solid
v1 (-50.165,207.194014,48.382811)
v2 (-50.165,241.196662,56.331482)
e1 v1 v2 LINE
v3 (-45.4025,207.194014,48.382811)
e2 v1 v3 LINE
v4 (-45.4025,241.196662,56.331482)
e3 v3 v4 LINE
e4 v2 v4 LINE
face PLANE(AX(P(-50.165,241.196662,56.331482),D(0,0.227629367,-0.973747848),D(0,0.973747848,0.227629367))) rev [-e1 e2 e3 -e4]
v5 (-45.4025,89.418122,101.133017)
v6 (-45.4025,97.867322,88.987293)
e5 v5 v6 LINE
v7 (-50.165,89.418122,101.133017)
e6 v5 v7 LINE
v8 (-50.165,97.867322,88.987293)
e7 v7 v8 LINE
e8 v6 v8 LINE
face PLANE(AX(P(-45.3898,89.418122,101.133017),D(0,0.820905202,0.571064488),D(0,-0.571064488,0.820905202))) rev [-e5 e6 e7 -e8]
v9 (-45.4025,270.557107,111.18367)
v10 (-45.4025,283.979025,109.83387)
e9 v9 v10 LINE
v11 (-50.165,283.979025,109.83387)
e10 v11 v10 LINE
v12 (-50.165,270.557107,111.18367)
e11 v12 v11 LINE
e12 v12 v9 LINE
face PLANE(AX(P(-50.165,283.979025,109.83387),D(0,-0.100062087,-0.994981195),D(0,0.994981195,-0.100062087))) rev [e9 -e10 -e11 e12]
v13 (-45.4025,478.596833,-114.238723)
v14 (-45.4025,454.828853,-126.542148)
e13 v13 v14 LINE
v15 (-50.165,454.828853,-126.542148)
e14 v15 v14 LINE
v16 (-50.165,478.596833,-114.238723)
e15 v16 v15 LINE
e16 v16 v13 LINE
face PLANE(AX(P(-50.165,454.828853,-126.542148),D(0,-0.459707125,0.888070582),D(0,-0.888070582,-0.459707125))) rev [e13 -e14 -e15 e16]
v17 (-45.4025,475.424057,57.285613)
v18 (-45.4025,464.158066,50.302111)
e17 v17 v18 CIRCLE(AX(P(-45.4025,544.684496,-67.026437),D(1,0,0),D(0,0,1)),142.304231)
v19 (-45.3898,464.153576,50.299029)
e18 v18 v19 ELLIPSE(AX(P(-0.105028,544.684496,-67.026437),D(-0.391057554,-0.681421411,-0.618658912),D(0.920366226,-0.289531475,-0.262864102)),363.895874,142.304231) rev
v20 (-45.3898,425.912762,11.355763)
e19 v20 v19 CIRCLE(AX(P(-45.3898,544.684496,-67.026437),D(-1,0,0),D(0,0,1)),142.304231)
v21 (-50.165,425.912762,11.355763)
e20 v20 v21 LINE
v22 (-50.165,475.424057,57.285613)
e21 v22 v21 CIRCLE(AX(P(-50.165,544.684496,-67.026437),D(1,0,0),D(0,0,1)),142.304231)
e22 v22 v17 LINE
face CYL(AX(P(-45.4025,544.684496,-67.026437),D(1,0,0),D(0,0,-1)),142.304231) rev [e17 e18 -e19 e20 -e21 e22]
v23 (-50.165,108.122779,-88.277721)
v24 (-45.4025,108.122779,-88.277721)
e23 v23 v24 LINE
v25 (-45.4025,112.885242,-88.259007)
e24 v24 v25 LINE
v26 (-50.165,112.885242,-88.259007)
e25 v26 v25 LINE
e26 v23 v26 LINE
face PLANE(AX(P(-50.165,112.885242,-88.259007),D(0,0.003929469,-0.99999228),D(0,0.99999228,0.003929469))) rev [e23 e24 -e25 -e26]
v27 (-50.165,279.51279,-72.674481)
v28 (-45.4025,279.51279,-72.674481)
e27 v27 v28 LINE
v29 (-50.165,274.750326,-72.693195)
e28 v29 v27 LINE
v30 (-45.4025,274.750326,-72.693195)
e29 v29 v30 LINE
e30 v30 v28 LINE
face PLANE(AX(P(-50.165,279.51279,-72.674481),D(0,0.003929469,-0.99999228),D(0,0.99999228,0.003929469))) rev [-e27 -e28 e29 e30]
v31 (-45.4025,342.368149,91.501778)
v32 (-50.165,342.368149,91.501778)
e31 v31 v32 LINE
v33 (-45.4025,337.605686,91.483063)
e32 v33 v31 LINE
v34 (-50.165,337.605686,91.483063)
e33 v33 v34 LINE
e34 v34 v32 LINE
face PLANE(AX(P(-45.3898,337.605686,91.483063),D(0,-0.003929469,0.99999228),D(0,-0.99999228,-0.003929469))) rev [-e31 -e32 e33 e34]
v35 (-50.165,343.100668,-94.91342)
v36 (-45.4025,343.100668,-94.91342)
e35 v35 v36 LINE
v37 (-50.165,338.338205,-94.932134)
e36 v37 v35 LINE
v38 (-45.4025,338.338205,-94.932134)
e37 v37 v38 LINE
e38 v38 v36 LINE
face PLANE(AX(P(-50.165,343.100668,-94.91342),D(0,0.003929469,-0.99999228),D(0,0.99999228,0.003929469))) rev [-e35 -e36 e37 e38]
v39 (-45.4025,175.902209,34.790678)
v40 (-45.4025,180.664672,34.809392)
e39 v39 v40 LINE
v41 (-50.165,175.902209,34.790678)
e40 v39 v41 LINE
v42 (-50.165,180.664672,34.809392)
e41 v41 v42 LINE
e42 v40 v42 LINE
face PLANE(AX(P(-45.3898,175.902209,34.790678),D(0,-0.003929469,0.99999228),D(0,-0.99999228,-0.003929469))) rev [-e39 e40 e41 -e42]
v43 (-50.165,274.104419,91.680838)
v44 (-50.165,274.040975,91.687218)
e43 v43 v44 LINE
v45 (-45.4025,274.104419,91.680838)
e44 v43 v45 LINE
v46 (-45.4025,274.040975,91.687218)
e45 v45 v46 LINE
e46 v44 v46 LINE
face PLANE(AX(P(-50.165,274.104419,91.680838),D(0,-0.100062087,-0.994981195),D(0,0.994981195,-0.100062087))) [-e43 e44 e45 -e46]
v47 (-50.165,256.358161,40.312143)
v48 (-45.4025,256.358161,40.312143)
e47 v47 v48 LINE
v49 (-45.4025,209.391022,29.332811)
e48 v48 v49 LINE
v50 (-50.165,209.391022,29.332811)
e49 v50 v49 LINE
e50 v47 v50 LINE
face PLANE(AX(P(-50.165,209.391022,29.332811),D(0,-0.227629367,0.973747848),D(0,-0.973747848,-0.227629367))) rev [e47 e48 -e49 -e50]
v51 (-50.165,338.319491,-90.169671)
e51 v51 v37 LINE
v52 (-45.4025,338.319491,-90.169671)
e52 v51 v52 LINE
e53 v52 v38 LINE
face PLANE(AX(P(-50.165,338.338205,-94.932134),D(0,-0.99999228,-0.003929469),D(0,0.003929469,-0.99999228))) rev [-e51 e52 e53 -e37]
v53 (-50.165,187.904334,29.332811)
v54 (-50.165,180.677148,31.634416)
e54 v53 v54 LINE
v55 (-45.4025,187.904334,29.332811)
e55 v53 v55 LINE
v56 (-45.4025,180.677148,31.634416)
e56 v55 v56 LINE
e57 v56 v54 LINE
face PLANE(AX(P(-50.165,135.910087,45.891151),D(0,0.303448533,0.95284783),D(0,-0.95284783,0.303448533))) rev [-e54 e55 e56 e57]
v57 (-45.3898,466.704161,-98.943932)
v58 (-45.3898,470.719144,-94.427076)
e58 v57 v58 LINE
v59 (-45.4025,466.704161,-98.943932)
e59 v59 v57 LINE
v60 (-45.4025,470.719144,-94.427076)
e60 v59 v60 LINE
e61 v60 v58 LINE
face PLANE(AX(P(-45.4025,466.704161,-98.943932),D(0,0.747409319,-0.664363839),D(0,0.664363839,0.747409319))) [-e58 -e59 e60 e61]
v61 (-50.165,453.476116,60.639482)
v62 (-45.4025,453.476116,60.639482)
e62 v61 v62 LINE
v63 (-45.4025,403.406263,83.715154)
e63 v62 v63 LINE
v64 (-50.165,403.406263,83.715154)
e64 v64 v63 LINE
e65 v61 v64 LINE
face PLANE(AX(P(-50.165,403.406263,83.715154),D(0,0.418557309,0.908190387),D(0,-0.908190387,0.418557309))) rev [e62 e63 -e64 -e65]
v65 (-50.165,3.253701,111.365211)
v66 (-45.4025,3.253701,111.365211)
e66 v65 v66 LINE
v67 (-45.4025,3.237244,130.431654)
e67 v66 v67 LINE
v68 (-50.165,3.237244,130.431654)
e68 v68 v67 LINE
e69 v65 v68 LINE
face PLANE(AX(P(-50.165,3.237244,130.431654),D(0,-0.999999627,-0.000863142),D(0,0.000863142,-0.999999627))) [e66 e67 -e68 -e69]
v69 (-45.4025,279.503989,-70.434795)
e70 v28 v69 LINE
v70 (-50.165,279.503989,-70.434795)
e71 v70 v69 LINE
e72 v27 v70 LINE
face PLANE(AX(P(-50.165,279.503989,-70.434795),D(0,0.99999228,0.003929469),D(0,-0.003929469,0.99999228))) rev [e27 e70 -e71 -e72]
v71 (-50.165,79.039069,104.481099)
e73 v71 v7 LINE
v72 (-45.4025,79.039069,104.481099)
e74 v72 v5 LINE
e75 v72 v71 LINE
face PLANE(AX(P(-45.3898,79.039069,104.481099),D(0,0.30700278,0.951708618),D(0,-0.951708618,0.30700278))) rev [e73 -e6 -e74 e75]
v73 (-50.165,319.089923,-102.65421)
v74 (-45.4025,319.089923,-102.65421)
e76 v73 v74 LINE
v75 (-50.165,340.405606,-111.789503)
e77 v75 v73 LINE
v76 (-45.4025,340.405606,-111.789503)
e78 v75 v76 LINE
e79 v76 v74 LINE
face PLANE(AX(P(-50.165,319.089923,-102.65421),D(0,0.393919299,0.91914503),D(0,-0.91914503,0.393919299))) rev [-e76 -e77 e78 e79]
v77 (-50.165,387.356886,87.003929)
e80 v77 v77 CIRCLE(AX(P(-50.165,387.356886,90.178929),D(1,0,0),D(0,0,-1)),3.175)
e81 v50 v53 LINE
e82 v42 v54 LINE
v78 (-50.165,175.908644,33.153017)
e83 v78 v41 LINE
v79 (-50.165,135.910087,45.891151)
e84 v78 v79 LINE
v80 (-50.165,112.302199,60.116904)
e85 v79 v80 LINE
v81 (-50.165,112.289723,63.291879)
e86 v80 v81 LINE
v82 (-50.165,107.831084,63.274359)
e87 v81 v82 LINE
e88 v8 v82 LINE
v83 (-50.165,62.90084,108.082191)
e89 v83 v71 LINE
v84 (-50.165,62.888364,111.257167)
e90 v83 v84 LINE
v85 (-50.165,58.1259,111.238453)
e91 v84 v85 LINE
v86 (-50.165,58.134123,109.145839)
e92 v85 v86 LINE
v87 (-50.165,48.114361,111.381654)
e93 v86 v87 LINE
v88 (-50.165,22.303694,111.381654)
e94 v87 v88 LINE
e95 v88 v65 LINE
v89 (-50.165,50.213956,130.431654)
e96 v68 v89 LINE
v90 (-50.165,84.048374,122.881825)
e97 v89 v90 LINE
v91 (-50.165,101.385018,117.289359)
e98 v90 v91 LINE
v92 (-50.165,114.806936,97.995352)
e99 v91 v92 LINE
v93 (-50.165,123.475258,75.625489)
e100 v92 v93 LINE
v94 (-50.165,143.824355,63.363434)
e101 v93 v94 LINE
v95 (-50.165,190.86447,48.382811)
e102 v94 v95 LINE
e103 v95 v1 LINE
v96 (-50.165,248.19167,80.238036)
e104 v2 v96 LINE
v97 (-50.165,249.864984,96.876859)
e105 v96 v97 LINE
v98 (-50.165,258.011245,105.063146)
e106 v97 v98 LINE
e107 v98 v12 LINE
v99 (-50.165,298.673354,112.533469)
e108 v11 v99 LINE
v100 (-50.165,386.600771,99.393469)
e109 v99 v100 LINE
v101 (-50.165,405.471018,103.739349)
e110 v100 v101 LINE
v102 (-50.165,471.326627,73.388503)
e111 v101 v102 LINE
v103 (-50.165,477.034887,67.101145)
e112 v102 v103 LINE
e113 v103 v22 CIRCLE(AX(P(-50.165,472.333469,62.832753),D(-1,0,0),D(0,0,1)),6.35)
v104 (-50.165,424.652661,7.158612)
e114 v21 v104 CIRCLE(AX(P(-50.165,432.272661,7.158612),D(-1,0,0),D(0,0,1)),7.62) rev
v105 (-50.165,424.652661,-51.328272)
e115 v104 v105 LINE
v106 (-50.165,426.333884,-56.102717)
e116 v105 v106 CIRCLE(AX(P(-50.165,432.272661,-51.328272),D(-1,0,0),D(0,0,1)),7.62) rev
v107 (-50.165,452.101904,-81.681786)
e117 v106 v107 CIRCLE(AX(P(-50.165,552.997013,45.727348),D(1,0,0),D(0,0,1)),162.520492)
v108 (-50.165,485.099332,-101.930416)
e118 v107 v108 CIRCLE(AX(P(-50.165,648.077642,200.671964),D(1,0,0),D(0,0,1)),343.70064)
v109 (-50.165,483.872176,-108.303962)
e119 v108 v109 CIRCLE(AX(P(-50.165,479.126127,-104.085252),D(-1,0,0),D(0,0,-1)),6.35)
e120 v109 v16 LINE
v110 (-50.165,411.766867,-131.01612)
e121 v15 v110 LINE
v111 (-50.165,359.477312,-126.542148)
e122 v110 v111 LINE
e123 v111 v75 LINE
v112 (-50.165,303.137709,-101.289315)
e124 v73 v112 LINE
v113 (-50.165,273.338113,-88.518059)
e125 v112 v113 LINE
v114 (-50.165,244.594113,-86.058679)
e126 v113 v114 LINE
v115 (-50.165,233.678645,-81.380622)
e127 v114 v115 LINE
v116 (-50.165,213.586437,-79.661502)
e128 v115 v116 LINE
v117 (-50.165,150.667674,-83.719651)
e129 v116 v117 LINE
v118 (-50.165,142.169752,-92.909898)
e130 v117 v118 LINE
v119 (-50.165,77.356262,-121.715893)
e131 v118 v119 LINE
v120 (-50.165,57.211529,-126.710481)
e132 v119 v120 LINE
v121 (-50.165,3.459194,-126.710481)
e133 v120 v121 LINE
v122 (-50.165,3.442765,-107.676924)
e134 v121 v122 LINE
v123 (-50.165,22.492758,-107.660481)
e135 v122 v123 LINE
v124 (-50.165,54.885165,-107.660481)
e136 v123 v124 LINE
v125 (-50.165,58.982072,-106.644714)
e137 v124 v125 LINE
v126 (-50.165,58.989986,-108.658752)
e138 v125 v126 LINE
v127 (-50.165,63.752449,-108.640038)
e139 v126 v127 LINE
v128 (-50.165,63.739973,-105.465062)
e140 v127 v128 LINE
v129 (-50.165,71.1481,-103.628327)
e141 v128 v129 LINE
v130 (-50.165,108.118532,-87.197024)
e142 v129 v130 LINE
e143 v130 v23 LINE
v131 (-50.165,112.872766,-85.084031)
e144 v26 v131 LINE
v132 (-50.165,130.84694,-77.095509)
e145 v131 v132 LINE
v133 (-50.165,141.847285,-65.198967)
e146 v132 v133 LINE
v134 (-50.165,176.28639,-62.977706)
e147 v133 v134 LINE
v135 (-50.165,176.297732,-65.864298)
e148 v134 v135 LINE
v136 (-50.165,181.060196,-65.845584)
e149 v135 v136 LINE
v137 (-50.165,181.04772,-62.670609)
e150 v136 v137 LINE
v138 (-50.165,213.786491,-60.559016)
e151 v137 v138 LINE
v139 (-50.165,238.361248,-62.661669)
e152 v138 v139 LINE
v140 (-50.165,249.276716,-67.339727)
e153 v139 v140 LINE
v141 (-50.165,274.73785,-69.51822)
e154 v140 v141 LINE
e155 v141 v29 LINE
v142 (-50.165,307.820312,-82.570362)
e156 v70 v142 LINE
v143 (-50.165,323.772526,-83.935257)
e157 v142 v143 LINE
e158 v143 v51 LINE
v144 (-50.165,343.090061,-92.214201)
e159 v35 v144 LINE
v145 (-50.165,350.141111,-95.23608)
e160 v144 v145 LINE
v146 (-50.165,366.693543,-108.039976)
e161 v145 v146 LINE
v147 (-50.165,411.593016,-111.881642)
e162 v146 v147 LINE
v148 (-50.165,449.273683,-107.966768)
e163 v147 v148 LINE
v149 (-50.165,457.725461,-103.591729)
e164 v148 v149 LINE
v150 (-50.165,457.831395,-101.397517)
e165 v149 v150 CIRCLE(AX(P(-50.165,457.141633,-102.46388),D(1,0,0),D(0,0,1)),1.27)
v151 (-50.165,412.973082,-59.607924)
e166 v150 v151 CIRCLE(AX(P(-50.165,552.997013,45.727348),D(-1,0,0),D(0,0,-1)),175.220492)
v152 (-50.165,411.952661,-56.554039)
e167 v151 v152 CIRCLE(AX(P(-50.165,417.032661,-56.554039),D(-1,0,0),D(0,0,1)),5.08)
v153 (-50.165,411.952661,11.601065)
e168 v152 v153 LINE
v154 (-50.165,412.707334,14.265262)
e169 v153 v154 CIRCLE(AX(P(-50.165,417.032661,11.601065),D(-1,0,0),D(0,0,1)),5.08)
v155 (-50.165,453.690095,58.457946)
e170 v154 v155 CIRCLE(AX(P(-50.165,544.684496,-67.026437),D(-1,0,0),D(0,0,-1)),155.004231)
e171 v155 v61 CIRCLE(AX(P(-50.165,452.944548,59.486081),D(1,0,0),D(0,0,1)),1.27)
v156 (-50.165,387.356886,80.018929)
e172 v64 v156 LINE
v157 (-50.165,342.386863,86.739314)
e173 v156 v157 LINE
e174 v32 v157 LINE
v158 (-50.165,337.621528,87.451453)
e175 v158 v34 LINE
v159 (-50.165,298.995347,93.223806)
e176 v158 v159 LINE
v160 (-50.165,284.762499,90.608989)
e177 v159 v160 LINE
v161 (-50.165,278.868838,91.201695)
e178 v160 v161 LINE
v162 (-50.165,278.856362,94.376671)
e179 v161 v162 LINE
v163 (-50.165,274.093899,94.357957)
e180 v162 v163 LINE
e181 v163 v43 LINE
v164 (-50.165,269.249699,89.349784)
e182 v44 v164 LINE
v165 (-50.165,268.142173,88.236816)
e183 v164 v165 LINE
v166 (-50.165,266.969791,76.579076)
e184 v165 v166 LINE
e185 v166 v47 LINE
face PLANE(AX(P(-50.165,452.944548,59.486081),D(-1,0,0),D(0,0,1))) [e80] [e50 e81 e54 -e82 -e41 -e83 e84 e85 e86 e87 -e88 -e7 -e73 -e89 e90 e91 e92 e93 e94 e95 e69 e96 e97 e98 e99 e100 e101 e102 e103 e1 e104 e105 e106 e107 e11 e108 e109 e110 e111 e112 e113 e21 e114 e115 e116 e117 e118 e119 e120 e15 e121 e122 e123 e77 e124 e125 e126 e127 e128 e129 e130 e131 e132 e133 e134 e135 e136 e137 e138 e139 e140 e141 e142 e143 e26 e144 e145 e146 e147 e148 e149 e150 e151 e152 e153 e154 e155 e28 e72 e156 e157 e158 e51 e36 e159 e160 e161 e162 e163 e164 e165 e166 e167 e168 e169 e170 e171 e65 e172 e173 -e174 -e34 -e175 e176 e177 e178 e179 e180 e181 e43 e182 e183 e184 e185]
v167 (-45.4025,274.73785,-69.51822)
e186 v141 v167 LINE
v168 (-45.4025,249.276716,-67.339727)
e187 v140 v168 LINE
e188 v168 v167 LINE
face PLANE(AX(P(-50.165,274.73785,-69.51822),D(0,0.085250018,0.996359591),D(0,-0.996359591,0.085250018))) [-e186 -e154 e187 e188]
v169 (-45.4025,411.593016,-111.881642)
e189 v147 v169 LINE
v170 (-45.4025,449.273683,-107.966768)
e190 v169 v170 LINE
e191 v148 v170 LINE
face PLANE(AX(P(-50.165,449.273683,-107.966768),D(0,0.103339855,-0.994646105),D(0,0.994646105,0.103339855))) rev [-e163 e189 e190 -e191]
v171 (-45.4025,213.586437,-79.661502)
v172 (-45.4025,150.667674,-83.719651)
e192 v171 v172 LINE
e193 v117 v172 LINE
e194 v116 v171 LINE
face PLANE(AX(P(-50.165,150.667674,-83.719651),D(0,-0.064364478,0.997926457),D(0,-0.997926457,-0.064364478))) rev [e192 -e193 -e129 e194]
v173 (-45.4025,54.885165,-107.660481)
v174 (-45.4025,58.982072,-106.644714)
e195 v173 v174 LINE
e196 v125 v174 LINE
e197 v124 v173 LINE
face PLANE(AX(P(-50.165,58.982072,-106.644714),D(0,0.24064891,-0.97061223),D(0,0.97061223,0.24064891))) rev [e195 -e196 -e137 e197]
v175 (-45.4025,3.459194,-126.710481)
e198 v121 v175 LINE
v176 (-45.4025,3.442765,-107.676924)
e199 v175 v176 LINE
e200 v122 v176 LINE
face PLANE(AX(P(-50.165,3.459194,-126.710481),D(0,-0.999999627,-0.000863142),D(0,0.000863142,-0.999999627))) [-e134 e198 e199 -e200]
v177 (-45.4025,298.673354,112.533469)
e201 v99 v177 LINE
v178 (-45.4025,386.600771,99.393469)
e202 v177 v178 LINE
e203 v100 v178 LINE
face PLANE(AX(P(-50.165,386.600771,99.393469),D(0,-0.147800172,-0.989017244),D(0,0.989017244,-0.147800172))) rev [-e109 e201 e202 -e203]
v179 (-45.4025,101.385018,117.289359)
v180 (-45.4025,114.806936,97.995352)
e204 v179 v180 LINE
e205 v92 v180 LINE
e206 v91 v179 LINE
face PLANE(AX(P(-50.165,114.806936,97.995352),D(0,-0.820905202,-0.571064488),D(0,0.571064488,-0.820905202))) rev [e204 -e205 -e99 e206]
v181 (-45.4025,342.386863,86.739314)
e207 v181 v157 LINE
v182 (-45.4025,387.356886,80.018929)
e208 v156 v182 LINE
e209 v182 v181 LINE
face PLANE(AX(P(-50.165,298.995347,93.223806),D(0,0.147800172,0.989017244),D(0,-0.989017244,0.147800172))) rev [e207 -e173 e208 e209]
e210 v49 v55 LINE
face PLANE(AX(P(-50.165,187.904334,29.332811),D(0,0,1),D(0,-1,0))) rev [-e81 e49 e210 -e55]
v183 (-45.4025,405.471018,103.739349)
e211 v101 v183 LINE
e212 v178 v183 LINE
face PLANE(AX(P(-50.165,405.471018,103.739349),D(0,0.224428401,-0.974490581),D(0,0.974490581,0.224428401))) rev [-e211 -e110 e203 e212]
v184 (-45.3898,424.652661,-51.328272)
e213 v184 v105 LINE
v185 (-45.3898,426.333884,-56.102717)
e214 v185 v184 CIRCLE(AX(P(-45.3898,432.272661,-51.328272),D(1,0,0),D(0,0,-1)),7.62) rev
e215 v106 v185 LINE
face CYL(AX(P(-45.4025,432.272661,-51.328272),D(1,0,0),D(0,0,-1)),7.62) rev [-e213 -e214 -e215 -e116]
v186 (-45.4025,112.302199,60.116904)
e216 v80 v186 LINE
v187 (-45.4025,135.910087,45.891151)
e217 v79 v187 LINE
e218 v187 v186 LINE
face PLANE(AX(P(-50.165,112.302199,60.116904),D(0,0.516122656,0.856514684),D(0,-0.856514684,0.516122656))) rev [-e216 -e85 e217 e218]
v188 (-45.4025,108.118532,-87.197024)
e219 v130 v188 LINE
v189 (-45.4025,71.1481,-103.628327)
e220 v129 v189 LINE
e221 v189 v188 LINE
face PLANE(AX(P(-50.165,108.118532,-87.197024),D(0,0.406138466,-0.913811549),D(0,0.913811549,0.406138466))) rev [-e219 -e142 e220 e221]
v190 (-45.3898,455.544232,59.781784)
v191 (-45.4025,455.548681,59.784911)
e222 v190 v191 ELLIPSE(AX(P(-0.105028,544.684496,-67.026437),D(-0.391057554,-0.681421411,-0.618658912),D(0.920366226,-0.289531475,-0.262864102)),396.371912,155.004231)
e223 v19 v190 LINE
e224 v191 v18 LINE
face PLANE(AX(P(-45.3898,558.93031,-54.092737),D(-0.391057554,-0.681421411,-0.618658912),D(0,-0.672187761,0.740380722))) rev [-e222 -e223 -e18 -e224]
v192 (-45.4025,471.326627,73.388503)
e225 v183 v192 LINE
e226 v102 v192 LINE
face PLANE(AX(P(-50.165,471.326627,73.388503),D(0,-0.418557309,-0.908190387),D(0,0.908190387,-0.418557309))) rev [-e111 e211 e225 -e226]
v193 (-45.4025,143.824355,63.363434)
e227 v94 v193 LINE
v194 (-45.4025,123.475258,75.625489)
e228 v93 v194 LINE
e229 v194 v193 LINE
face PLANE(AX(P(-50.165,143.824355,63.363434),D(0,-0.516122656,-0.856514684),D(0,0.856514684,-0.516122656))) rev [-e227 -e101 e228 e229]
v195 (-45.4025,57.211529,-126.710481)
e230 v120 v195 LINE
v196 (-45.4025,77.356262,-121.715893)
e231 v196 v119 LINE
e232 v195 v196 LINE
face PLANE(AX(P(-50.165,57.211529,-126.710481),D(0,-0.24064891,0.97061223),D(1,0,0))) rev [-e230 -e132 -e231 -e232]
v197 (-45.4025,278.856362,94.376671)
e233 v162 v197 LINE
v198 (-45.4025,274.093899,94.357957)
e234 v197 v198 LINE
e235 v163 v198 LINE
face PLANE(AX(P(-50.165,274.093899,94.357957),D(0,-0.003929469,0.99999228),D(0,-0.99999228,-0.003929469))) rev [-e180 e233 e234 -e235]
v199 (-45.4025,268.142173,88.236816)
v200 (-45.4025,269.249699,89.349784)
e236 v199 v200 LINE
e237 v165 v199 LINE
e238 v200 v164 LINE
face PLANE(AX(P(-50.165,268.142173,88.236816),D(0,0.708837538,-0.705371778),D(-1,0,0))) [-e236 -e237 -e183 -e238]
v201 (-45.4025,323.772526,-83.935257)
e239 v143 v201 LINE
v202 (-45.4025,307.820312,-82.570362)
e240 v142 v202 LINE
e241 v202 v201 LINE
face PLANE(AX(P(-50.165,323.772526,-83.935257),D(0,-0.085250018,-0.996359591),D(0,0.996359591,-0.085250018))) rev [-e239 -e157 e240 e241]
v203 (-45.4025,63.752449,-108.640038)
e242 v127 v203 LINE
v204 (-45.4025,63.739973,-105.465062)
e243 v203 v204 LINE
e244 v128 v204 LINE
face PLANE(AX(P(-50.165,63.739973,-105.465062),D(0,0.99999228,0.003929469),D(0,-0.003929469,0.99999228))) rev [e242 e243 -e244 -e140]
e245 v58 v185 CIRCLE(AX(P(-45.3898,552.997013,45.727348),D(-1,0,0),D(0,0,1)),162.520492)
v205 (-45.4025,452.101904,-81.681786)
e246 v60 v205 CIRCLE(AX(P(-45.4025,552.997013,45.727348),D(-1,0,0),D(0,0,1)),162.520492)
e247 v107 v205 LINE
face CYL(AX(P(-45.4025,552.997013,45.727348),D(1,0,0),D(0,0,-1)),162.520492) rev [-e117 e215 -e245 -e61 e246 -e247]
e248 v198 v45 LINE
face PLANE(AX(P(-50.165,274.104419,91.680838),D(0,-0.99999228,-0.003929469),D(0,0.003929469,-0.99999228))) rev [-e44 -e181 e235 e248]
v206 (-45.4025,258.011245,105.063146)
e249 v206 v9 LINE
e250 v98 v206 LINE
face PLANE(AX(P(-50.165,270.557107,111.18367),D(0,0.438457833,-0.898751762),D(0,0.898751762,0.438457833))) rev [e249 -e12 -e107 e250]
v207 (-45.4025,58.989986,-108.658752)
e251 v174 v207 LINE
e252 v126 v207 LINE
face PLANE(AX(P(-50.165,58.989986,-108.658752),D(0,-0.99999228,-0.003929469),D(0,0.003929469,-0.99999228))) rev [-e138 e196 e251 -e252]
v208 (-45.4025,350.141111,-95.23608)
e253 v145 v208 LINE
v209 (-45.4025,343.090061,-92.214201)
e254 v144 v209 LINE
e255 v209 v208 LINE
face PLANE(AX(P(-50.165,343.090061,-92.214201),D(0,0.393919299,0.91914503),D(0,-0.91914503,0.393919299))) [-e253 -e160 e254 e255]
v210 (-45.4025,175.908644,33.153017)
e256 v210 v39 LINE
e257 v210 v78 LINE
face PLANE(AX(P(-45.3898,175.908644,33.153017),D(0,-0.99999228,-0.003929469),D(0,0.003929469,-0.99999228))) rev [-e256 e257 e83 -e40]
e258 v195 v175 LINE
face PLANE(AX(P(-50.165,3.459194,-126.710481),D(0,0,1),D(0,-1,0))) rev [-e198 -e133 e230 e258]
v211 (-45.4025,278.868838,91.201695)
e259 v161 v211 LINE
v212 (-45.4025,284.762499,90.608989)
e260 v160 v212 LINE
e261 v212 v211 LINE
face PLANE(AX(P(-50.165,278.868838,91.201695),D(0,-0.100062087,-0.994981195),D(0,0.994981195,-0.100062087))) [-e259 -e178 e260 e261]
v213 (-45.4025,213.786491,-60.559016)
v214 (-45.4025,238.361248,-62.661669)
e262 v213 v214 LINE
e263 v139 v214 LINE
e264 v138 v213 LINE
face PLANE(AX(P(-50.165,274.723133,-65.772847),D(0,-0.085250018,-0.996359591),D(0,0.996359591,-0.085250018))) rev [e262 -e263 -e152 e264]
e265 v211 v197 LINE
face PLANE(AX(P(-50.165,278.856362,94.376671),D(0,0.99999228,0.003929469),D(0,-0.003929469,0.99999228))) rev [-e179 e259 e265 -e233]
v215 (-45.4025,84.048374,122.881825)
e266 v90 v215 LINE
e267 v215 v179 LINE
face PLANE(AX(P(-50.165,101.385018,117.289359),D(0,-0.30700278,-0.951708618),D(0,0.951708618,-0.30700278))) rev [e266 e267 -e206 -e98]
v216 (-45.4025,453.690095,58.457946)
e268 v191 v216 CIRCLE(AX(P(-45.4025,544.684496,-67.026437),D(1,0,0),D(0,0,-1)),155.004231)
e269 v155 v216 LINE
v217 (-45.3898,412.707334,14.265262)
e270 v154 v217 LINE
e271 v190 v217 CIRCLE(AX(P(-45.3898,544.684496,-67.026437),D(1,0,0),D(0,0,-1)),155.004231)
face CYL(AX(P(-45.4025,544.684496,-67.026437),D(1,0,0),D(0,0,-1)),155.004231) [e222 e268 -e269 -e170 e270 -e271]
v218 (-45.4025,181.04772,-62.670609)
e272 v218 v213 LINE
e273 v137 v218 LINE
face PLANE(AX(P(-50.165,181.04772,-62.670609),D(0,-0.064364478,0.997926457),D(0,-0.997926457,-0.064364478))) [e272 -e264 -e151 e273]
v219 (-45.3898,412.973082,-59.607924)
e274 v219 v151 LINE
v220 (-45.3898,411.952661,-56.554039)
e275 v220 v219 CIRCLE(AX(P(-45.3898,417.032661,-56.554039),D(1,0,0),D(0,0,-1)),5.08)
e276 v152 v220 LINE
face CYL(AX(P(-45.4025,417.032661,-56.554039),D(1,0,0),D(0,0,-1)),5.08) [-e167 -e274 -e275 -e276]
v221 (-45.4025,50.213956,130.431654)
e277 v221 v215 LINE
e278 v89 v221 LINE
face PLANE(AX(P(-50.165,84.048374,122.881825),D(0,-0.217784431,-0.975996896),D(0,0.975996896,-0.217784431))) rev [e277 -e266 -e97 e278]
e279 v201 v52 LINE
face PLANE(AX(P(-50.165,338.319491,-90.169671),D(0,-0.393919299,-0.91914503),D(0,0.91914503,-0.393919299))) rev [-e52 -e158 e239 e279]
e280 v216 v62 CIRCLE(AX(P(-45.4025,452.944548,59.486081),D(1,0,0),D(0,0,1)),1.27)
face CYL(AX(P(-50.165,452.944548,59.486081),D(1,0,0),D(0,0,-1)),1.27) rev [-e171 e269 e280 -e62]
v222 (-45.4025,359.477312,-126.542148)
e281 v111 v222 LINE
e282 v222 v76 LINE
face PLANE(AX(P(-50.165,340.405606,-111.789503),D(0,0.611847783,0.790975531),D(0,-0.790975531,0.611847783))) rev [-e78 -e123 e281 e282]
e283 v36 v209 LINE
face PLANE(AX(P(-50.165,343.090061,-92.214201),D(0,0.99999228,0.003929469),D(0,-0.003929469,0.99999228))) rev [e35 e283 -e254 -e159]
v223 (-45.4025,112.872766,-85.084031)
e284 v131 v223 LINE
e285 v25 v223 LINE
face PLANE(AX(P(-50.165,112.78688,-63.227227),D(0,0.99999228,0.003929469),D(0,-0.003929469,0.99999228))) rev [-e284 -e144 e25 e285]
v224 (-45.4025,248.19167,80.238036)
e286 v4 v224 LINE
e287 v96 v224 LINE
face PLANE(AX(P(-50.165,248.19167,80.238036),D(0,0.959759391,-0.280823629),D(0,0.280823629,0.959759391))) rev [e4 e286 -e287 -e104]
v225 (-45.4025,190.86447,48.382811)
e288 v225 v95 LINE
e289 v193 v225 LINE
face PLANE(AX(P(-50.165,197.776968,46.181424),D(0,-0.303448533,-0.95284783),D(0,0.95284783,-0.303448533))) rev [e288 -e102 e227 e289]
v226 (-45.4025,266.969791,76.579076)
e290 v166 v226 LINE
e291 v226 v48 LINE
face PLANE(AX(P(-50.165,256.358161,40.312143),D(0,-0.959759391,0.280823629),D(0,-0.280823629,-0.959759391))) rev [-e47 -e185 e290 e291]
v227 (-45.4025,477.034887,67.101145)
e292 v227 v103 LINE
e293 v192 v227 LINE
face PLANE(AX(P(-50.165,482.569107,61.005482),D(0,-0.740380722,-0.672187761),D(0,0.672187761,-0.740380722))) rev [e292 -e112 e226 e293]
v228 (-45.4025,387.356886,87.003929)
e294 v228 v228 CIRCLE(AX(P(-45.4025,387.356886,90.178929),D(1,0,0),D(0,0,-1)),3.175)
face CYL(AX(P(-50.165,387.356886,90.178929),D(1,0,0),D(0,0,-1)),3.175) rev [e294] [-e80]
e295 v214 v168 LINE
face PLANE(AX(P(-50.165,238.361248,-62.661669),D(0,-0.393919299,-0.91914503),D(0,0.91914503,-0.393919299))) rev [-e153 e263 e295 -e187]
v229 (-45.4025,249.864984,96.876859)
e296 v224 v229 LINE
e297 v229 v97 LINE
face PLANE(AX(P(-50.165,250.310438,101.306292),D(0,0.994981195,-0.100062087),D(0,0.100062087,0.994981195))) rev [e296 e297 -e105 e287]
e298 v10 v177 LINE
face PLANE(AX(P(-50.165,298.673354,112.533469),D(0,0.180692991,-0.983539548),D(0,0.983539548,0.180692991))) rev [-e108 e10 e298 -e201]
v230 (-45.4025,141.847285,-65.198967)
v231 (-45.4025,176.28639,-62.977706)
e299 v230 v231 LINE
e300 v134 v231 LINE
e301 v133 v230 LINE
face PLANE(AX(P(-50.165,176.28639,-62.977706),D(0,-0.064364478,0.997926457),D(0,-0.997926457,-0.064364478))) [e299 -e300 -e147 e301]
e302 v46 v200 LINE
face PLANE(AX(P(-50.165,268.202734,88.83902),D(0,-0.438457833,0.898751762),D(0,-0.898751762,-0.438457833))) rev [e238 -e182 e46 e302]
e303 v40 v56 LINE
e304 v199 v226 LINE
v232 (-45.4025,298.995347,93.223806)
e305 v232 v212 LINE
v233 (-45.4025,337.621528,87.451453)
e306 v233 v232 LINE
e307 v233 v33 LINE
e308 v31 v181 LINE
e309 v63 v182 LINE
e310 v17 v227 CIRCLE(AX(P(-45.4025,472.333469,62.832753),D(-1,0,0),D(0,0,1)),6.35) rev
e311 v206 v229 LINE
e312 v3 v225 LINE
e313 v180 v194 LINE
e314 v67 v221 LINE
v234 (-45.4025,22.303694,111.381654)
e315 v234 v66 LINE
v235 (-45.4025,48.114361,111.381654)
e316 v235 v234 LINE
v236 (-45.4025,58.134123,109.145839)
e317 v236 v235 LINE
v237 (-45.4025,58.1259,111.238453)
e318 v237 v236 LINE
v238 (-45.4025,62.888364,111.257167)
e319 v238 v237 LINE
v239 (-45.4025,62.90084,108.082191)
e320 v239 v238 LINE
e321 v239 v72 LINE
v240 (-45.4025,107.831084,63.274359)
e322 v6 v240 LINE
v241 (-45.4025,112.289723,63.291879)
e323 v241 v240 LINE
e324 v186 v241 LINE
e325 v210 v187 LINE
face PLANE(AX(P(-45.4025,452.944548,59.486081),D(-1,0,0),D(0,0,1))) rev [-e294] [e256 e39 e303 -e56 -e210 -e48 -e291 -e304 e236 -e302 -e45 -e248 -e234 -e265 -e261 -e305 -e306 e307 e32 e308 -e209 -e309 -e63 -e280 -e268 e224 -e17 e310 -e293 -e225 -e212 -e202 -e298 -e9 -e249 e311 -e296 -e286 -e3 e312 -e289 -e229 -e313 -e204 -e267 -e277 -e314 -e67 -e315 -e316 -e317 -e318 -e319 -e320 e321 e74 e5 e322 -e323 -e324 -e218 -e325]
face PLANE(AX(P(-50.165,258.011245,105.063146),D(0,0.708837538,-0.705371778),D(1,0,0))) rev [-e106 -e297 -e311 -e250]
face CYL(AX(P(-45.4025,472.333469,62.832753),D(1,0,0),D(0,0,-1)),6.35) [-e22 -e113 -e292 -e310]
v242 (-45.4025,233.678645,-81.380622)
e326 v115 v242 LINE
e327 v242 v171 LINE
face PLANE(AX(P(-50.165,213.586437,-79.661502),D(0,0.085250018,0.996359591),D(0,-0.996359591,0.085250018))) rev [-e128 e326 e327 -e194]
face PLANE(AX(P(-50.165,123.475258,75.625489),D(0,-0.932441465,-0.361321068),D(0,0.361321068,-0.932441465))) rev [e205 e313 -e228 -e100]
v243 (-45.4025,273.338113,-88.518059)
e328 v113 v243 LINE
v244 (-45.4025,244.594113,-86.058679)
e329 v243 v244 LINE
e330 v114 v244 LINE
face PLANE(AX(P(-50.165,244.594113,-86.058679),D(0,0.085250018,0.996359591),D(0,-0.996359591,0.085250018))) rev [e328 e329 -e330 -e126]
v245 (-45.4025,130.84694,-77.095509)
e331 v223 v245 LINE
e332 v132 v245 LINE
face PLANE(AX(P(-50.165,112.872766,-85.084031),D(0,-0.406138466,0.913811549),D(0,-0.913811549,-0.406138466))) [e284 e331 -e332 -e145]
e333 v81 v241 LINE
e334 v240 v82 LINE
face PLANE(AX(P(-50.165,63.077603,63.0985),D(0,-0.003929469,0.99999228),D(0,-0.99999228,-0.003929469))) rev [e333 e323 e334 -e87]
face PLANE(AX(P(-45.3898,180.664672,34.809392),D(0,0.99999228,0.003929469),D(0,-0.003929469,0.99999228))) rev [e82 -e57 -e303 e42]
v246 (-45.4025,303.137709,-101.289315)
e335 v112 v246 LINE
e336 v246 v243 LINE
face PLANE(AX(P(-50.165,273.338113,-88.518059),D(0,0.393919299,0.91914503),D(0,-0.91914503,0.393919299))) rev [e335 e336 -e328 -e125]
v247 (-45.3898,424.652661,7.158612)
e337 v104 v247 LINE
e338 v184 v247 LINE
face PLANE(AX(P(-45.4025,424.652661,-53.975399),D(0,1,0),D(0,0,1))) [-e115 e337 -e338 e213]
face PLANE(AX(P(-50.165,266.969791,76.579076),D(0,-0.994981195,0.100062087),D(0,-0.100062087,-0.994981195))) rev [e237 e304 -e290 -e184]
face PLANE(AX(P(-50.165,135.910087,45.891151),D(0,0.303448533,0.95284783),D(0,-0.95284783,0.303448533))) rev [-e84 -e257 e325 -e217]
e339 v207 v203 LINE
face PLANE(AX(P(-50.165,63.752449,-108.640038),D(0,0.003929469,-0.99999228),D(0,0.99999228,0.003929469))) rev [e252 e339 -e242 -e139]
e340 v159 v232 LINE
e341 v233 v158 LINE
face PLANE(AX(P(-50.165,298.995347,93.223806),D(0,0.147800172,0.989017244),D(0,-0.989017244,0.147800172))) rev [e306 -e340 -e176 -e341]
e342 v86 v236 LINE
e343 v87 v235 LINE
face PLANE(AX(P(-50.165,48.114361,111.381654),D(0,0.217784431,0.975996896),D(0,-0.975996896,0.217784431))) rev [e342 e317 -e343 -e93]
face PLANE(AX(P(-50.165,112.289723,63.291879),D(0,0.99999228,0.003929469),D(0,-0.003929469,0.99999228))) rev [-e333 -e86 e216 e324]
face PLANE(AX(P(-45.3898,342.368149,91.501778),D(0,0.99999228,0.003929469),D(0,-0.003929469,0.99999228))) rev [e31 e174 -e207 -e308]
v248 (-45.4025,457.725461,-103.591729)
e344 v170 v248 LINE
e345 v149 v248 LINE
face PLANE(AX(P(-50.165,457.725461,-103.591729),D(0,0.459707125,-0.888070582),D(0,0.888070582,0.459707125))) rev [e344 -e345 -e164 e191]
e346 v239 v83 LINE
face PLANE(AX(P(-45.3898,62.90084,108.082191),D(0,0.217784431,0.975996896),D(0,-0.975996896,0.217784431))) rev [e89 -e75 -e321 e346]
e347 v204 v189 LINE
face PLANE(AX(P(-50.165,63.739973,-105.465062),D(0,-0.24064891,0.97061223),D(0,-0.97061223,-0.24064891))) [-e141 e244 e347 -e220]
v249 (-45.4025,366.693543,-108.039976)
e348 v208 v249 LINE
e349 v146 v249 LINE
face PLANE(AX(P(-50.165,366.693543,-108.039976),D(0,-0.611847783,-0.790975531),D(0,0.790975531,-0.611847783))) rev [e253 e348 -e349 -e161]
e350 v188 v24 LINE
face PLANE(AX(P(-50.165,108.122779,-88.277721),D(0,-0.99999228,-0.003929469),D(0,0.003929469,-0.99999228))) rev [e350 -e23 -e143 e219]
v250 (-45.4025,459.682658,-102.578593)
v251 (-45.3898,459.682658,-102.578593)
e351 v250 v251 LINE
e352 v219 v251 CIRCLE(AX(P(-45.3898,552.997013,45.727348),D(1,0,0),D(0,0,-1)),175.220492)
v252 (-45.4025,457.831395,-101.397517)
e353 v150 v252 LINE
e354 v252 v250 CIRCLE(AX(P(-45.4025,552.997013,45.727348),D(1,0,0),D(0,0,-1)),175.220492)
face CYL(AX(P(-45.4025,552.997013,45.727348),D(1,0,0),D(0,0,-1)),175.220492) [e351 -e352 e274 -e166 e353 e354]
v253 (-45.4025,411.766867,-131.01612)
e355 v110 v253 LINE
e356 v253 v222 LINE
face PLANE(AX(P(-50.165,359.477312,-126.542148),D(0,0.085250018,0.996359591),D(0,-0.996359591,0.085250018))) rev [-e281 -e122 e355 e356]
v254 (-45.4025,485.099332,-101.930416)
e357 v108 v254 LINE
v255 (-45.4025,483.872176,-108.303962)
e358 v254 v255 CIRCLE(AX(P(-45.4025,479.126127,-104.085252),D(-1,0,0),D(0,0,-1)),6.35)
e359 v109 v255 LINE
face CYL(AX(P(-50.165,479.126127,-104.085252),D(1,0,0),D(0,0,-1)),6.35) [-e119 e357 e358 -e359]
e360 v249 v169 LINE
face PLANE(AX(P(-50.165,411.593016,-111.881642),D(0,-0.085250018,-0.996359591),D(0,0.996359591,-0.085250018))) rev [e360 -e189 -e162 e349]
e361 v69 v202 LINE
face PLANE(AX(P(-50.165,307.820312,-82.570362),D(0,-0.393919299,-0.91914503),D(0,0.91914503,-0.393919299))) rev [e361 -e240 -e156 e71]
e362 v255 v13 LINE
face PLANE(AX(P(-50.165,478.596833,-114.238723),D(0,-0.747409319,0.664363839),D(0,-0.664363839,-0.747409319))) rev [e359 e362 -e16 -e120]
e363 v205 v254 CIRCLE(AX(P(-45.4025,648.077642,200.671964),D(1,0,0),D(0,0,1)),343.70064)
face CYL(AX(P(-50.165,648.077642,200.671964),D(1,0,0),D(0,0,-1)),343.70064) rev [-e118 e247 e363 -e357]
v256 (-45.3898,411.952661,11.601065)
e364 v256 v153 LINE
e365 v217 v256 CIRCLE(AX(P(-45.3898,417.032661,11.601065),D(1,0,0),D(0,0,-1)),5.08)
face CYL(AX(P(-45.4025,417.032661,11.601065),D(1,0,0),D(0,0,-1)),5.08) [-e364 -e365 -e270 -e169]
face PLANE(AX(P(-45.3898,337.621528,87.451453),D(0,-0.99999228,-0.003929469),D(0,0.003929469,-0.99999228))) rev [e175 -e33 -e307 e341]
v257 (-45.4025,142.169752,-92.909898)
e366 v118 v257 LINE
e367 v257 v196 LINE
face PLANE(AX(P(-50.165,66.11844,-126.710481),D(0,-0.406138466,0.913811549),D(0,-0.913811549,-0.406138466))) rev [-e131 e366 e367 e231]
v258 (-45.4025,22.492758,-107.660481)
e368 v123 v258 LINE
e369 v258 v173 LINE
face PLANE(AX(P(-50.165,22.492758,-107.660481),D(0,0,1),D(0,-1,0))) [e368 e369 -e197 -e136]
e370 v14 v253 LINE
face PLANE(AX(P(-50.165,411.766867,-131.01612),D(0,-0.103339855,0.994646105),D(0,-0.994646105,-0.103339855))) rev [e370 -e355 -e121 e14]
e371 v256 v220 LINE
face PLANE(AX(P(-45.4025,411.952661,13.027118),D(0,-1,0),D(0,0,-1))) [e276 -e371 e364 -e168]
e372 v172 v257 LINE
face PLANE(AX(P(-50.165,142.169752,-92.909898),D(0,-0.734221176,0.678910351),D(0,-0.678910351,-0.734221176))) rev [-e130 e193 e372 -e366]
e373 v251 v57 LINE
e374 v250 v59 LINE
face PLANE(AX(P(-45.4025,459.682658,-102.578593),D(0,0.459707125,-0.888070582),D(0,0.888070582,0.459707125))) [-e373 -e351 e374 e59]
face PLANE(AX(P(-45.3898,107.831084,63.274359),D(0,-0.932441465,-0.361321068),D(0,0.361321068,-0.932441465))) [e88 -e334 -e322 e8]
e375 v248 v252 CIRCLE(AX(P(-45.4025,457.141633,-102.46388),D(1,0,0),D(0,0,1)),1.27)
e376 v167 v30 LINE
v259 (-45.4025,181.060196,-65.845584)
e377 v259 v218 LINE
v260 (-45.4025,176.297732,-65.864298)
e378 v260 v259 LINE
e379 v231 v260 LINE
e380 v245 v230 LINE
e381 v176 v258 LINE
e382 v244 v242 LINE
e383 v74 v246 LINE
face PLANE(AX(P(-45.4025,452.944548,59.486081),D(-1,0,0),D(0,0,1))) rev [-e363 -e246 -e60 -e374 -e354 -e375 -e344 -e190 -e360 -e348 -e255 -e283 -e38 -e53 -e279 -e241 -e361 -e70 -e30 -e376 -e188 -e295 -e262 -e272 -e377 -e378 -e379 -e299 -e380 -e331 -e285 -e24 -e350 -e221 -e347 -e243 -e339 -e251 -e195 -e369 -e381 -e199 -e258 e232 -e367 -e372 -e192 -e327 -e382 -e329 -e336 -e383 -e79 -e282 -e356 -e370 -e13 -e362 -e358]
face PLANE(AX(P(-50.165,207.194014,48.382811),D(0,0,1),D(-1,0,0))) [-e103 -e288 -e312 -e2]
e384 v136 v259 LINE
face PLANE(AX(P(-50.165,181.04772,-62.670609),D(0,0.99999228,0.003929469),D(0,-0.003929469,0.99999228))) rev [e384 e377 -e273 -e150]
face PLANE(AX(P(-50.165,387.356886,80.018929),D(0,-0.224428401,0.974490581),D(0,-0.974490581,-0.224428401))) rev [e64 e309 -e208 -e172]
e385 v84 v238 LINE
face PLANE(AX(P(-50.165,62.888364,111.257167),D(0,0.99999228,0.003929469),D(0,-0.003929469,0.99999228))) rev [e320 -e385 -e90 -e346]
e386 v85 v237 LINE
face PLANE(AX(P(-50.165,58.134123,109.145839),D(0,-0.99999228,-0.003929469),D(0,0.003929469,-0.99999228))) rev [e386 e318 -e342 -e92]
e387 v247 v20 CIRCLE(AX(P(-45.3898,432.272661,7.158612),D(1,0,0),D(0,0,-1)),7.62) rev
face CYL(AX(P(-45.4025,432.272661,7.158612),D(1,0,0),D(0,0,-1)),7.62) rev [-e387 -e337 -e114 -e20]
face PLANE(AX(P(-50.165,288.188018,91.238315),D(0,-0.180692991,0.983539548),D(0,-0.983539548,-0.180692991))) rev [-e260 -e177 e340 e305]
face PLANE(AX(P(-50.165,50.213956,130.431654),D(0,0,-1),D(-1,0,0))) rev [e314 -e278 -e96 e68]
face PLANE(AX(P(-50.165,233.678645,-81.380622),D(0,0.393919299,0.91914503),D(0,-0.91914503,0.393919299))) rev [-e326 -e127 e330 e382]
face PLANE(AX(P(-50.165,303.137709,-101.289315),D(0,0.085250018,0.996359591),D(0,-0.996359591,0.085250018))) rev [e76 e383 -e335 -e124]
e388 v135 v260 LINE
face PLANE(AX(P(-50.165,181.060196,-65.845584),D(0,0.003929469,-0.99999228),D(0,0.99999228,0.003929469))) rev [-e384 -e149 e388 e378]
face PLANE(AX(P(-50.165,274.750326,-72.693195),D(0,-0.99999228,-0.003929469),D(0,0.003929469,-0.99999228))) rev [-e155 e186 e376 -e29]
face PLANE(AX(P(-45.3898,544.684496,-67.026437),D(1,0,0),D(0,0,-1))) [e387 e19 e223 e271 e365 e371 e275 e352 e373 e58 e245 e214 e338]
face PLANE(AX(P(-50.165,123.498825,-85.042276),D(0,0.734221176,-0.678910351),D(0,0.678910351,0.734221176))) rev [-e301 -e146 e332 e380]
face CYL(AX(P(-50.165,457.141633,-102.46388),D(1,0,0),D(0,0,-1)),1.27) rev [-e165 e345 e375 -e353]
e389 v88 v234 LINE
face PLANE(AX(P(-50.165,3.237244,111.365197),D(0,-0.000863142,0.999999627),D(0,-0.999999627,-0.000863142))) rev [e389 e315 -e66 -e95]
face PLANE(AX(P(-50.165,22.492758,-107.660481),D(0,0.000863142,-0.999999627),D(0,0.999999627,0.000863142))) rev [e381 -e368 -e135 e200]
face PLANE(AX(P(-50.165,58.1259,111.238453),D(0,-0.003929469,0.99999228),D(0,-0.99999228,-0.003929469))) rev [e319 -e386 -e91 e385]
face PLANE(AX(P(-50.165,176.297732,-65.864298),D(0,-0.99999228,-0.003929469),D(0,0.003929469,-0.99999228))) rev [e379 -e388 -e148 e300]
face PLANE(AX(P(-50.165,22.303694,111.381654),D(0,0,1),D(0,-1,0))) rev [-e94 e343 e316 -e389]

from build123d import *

# Parameters (mm, degrees)
BOSS_EXTRUDE1_DEPTH = 0.0127
BOSS_EXTRUDE2_DEPTH = 4.7625
CUT_EXTRUDE1_DEPTH  = 503.866877
CUT_EXTRUDE2_DEPTH  = 503.866877
CUT_EXTRUDE3_DEPTH  = 503.866877
CUT_EXTRUDE4_DEPTH  = 503.866756562
CUT_EXTRUDE5_DEPTH  = 503.866756562
DRAFT1_ANGLE        = -23.423733099
DRAFT2_ANGLE        = 5.115544643
DRAFT3_ANGLE        = -5.967888323
DRAFT4_ANGLE        = 5.967888323
DRAFT5_ANGLE        = 23.737346389
DRAFT6_ANGLE        = 13.699700153
DRAFT7_ANGLE        = 20.956206915
DRAFT8_ANGLE        = -0.049454377
DRAFT9_ANGLE        = 3.465221439
DRAFT10_ANGLE       = -3.465221439
DRAFT11_START       = -117
DRAFT11_OUTLINE_W   = 4.7625
DRAFT11_OUTLINE_H   = 32.392406503
DRAFT11_DEPTH       = 9.339519007
DRAFT12_ANGLE       = 0.049454377
CHAMFER1_SIZE       = 0.605241869
CHAMFER1_SIZE2      = 1.164909596
CHAMFER2_SIZE       = 9.670928998
CHAMFER2_SIZE2      = 7.254566107
CHAMFER3_SIZE       = 4.192230568
CHAMFER3_SIZE_2     = 1.781251189
CHAMFER4_SIZE       = 8.568336776
CHAMFER4_SIZE2      = 4.451775644
CHAMFER5_SIZE       = 8.906910487
CHAMFER5_SIZE2      = 12.297746559
FILLET1_R           = 5.08
FILLET2_R           = 6.35
FILLET3_R           = 7.62
SKETCH8_R           = 3.175
CUT_EXTRUDE6_DEPTH  = 503.866756562


with BuildPart() as part:
    # Sketch1 → Boss-Extrude1 (new body)
    with BuildSketch(Plane(origin=(-45.3898, 0, 0), x_dir=(0, 0, -1), z_dir=(1, 0, 0))):
        with BuildLine():
            Line((-13.027117867, 411.952661405), (58.2376066, 411.952661405))
            ThreePointArc((58.2376066, 411.952661405), (82.645894032, 433.738757071), (102.578592504, 459.682657922))
            Line((102.578592504, 459.682657922), (98.943932202, 466.704160778))
            Line((98.943932202, 466.704160778), (94.427076157, 470.71914393))
            ThreePointArc((94.427076157, 470.71914393), (76.393067454, 445.761223724), (53.975399251, 424.652661405))
            Line((53.975399251, 424.652661405), (-9.412118588, 424.652661405))
            ThreePointArc((-9.412118588, 424.652661405), (-32.493316198, 442.967669513), (-51.307892988, 465.643491556))
            Line((-51.307892988, 465.643491556), (-60.806367703, 457.019876355))
            ThreePointArc((-60.806367703, 457.019876355), (-39.331205359, 431.926509848), (-13.027117867, 411.952661405))
        make_face()
    extrude(amount=-BOSS_EXTRUDE1_DEPTH)

    # Sketch2 → Boss-Extrude2 (add)
    with BuildSketch(Plane.ZY.offset(45.4025)):
        with BuildLine():
            Line((63.098500001, 63.077602974), (63.291879008, 112.289723034))
            Line((63.291879008, 112.289723034), (60.11690352, 112.302199099))
            Line((60.11690352, 112.302199099), (45.891151151, 135.910086956))
            Line((45.891151151, 135.910086956), (29.332811414, 187.904334246))
            Line((29.332811414, 187.904334246), (29.332811414, 209.391021623))
            Line((29.332811414, 209.391021623), (40.312142586, 256.358160528))
            Line((40.312142586, 256.358160528), (76.579075699, 266.969790755))
            Line((76.579075699, 266.969790755), (88.839020466, 268.202734319))
            Line((88.839020466, 268.202734319), (91.680534506, 274.027275603))
            Line((91.680534506, 274.027275603), (91.68083764, 274.104418767))
            Line((91.68083764, 274.104418767), (94.357956542, 274.093899029))
            Line((94.357956542, 274.093899029), (94.37667064, 278.856362261))
            Line((94.37667064, 278.856362261), (91.201695152, 278.868838325))
            Line((91.201695152, 278.868838325), (91.238314866, 288.188018226))
            Line((91.238314866, 288.188018226), (93.223805533, 298.995347166))
            Line((93.223805533, 298.995347166), (80.018928963, 387.356885758))
            Line((80.018928963, 387.356885758), (83.715153611, 403.40626313))
            Line((83.715153611, 403.40626313), (60.639482355, 453.476115857))
            ThreePointArc((60.639482355, 453.476115857), (59.610055268, 454.208482516), (58.457946256, 453.690094752))
            ThreePointArc((58.457946256, 453.690094752), (37.83997486, 430.538330076), (13.027117867, 411.952661405))
            Line((13.027117867, 411.952661405), (-58.2376066, 411.952661405))
            ThreePointArc((-58.2376066, 411.952661405), (-81.896078346, 432.936686808), (-101.39751725, 457.831394844))
            ThreePointArc((-101.39751725, 457.831394844), (-102.525122265, 458.410155941), (-103.591729488, 457.725461477))
            Line((-103.591729488, 457.725461477), (-107.966767627, 449.273683253))
            Line((-107.966767627, 449.273683253), (-111.881642193, 411.593015556))
            Line((-111.881642193, 411.593015556), (-108.039976128, 366.693543428))
            Line((-108.039976128, 366.693543428), (-92.201907276, 346.218638937))
            Line((-92.201907276, 346.218638937), (-92.214201021, 343.09006127))
            Line((-92.214201021, 343.09006127), (-94.913419834, 343.100667849))
            Line((-94.913419834, 343.100667849), (-94.932133931, 338.338204617))
            Line((-94.932133931, 338.338204617), (-90.1696707, 338.31949052))
            Line((-90.1696707, 338.31949052), (-83.935257282, 323.772525879))
            Line((-83.935257282, 323.772525879), (-82.57036198, 307.820312032))
            Line((-82.57036198, 307.820312032), (-70.434794903, 279.503988853))
            Line((-70.434794903, 279.503988853), (-72.674480904, 279.512789698))
            Line((-72.674480904, 279.512789698), (-72.693195002, 274.750326466))
            Line((-72.693195002, 274.750326466), (-65.772846516, 274.72313296))
            Line((-65.772846516, 274.72313296), (-62.454891666, 235.944535654))
            Line((-62.454891666, 235.944535654), (-62.670608684, 181.0477196))
            Line((-62.670608684, 181.0477196), (-65.845584172, 181.060195665))
            Line((-65.845584172, 181.060195665), (-65.86429827, 176.297732434))
            Line((-65.86429827, 176.297732434), (-62.977705988, 176.28638957))
            Line((-62.977705988, 176.28638957), (-63.227227287, 112.786879815))
            Line((-63.227227287, 112.786879815), (-88.259006751, 112.885242183))
            Line((-88.259006751, 112.885242183), (-88.277720849, 108.122778952))
            Line((-88.277720849, 108.122778952), (-87.197024048, 108.118532354))
            Line((-87.197024048, 108.118532354), (-105.452076716, 67.044663851))
            Line((-105.452076716, 67.044663851), (-105.465062496, 63.73997343))
            Line((-105.465062496, 63.73997343), (-108.640037983, 63.752449495))
            Line((-108.640037983, 63.752449495), (-108.658752081, 58.989986263))
            Line((-108.658752081, 58.989986263), (-106.644713581, 58.9820721))
            Line((-106.644713581, 58.9820721), (-115.689979538, 22.499688915))
            Line((-115.689979538, 22.499688915), (-107.660480993, 22.492758318))
            Line((-107.660480993, 22.492758318), (-107.67690966, 3.459194076))
            Line((-107.67690966, 3.459194076), (-126.710480993, 3.459194076))
            Line((-126.710480993, 3.459194076), (-126.710480993, 66.118439508))
            Line((-126.710480993, 66.118439508), (-92.909897604, 142.169752132))
            Line((-92.909897604, 142.169752132), (-83.719650595, 150.6676735))
            Line((-83.719650595, 150.6676735), (-79.661502452, 213.586437078))
            Line((-79.661502452, 213.586437078), (-81.380621848, 233.678645015))
            Line((-81.380621848, 233.678645015), (-86.058679342, 244.5941125))
            Line((-86.058679342, 244.5941125), (-88.518059029, 273.338112591))
            Line((-88.518059029, 273.338112591), (-101.28931463, 303.137708994))
            Line((-101.28931463, 303.137708994), (-102.654209933, 319.089922841))
            Line((-102.654209933, 319.089922841), (-111.78950274, 340.405606059))
            Line((-111.78950274, 340.405606059), (-126.542147774, 359.477312393))
            Line((-126.542147774, 359.477312393), (-131.016120376, 411.766867185))
            Line((-131.016120376, 411.766867185), (-126.542147774, 454.828853484))
            Line((-126.542147774, 454.828853484), (-114.238723117, 478.596832935))
            Line((-114.238723117, 478.596832935), (-108.303962247, 483.87217593))
            ThreePointArc((-108.303962247, 483.87217593), (-105.285823641, 485.361600068), (-101.930416001, 485.099332124))
            ThreePointArc((-101.930416001, 485.099332124), (-92.271078374, 468.315288335), (-81.681786038, 452.101904447))
            ThreePointArc((-81.681786038, 452.101904447), (-68.654979704, 437.543154295), (-53.975399251, 424.652661405))
            Line((-53.975399251, 424.652661405), (9.412118588, 424.652661405))
            ThreePointArc((9.412118588, 424.652661405), (39.230903664, 450.027897644), (61.005482484, 482.569106517))
            Line((61.005482484, 482.569106517), (73.3885029, 471.326627455))
            Line((73.3885029, 471.326627455), (103.739348885, 405.471018242))
            Line((103.739348885, 405.471018242), (99.393468652, 386.600771296))
            Line((99.393468652, 386.600771296), (112.533469465, 298.673354268))
            Line((112.533469465, 298.673354268), (109.833870487, 283.979024727))
            Line((109.833870487, 283.979024727), (111.183669976, 270.557106919))
            Line((111.183669976, 270.557106919), (101.306292113, 250.310437595))
            Line((101.306292113, 250.310437595), (80.238035837, 248.191670221))
            Line((80.238035837, 248.191670221), (56.331482353, 241.196661715))
            Line((56.331482353, 241.196661715), (46.181423967, 197.776967512))
            Line((46.181423967, 197.776967512), (63.363434196, 143.824354935))
            Line((63.363434196, 143.824354935), (75.625489201, 123.475257613))
            Line((75.625489201, 123.475257613), (97.995352213, 114.806935695))
            Line((97.995352213, 114.806935695), (117.289359061, 101.385017888))
            Line((117.289359061, 101.385017888), (122.881824815, 84.048374053))
            Line((122.881824815, 84.048374053), (130.431653581, 50.213956247))
            Line((130.431653581, 50.213956247), (130.431653581, 3.237243921))
            Line((130.431653581, 3.237243921), (111.365196529, 3.237243921))
            Line((111.365196529, 3.237243921), (111.381653581, 22.303693871))
            Line((111.381653581, 22.303693871), (111.381653581, 48.114361138))
            Line((111.381653581, 48.114361138), (109.145838905, 58.134123205))
            Line((109.145838905, 58.134123205), (111.238452841, 58.125900279))
            Line((111.238452841, 58.125900279), (111.257166938, 62.888363511))
            Line((111.257166938, 62.888363511), (63.098500001, 63.077602974))
        make_face()
    extrude(amount=BOSS_EXTRUDE2_DEPTH)

    # Sketch3 → Cut-Extrude1 (cut, through all)
    with BuildSketch(Plane.ZY.offset(50.165)):
        Polygon((108.082191451, 62.900839576), (104.481099005, 79.039068683), (101.133017225, 89.418122202), (74.729088783, 107.786072422), (63.274358787, 107.831083779), (63.098500001, 63.077602974), align=None)
    extrude(amount=-CUT_EXTRUDE1_DEPTH, mode=Mode.SUBTRACT)

    # Sketch4 → Cut-Extrude2 (cut, through all)
    with BuildSketch(Plane.ZY.offset(50.165)):
        Polygon((33.153017032, 175.90864393), (34.790677515, 175.902208744), (34.809391613, 180.664671975), (31.634416125, 180.67714804), align=None)
    extrude(amount=-CUT_EXTRUDE2_DEPTH, mode=Mode.SUBTRACT)

    # Sketch5 → Cut-Extrude3 (cut, through all)
    with BuildSketch(Plane.ZY.offset(50.165)):
        Polygon((87.451452952, 337.621528381), (91.48306349, 337.605686169), (91.501777588, 342.3681494), (86.739314356, 342.386863498), align=None)
    extrude(amount=-CUT_EXTRUDE3_DEPTH, mode=Mode.SUBTRACT)

    # Sketch6 → Cut-Extrude4 (cut, through all)
    with BuildSketch(Plane(origin=(-45.4025, 0, 0), x_dir=(0, 0, -1), z_dir=(1, 0, 0))):
        Polygon((85.084031263, 112.872766118), (85.042276171, 123.498824601), (63.105427604, 143.78311228), (63.227227287, 112.786879815), align=None)
    extrude(amount=-CUT_EXTRUDE4_DEPTH, mode=Mode.SUBTRACT)

    # Sketch7 → Cut-Extrude5 (cut, through all)
    with BuildSketch(Plane(origin=(-45.4025, 0, 0), x_dir=(0, 0, -1), z_dir=(1, 0, 0))):
        Polygon((65.772846516, 274.72313296), (62.661669198, 238.361248053), (69.597567272, 254.545010226), (69.518219514, 274.737850401), align=None)
    extrude(amount=-CUT_EXTRUDE5_DEPTH, mode=Mode.SUBTRACT)

    # Draft1
    draft1_faces = [part.faces().sort_by_distance(p)[0] for p in [
        (-47.78375, 344.654350103, -92.208054149),
    ]]
    draft(draft1_faces, Plane(origin=(-50.165, 343.09006127, -92.214201021), x_dir=(0, 0.003929469288600158, -0.9999922796057528), z_dir=(0, -0.9999922796057528, -0.003929469288600158)), DRAFT1_ANGLE)

    # Draft2
    draft2_faces = [part.faces().sort_by_distance(p)[0] for p in [
        (-47.78375, 264.641430314, -69.557893393),
    ]]
    draft(draft2_faces, Plane(origin=(-50.165, 274.750326466, -72.693195002), x_dir=(0, -0.003929469288469372, 0.9999922796057533), z_dir=(0, 0.9999922796057533, 0.003929469288469372)), DRAFT2_ANGLE)

    # Draft3
    draft3_faces = [part.faces().sort_by_distance(p)[0] for p in [
        (-47.78375, 274.065847185, 91.680686073),
    ]]
    draft(draft3_faces, Plane(origin=(-50.165, 274.104418767, 91.68083764), x_dir=(0, -0.003929469288490345, 0.9999922796057532), z_dir=(0, 0.9999922796057532, 0.003929469288490345)), DRAFT3_ANGLE)

    # Draft4
    draft4_faces = [part.faces().sort_by_distance(p)[0] for p in [
        (-47.78375, 283.528428276, 91.220005009),
    ]]
    draft(draft4_faces, Plane(origin=(-50.165, 278.856362261, 94.37667064), x_dir=(0, 0.003929469288483807, -0.9999922796057532), z_dir=(0, -0.9999922796057532, -0.003929469288483807)), DRAFT4_ANGLE)

    # Draft5
    draft5_faces = [part.faces().sort_by_distance(p)[0] for p in [
        (-47.78375, 118.185795359, -85.063153717),
    ]]
    draft(draft5_faces, Plane(origin=(-50.165, 112.786879815, -63.227227287), x_dir=(0, 0.003929469288636028, -0.9999922796057527), z_dir=(0, -0.9999922796057527, -0.003929469288636028)), DRAFT5_ANGLE)

    # Draft6
    draft6_faces = [part.faces().sort_by_distance(p)[0] for p in [
        (-47.78375, 65.39231864, -105.458569606),
    ]]
    draft(draft6_faces, Plane(origin=(-50.165, 63.73997343, -105.465062496), x_dir=(0, 0.003929469288638521, -0.9999922796057527), z_dir=(0, -0.9999922796057527, -0.003929469288638521)), DRAFT6_ANGLE)

    # Draft7
    draft7_faces = [part.faces().sort_by_distance(p)[0] for p in [
        (-47.78375, 107.808578101, 69.001723785),
    ]]
    draft(draft7_faces, Plane(origin=(-50.165, 63.077602974, 63.098500001), x_dir=(0, -0.9999922796057527, -0.00392946928863582), z_dir=(0, 0.00392946928863582, -0.9999922796057527)), DRAFT7_ANGLE)

    # Draft8
    draft8_faces = [part.faces().sort_by_distance(p)[0] for p in [
        (-47.78375, 3.237243921, 120.898425055),
    ]]
    draft(draft8_faces, Plane(origin=(-50.165, 50.213956247, 130.431653581), x_dir=(1, 0, 0), z_dir=(0, 0, 1)), DRAFT8_ANGLE)

    # Draft9
    draft9_faces = [part.faces().sort_by_distance(p)[0] for p in [
        (-47.78375, 208.496127627, -62.562750175),
    ]]
    draft(draft9_faces, Plane(origin=(-50.165, 181.0477196, -62.670608684), x_dir=(0, 0.0039294692886257, -0.9999922796057527), z_dir=(0, -0.9999922796057527, -0.0039294692886257)), DRAFT9_ANGLE)

    # Draft10
    draft10_faces = [part.faces().sort_by_distance(p)[0] for p in [
        (-47.78375, 160.034750925, -63.041566796),
    ]]
    draft(draft10_faces, Plane(origin=(-50.165, 176.297732434, -65.86429827), x_dir=(0, -0.003929469288640679, 0.9999922796057527), z_dir=(0, 0.9999922796057527, 0.003929469288640679)), DRAFT10_ANGLE)

    # Draft11: read off the stored shape, not the designer's step
    # Draft11 outline → Draft11 (add)
    with BuildSketch(Plane.XY.offset(DRAFT11_START)):
        with Locations((-47.78375, 38.68896157)):
            Rectangle(DRAFT11_OUTLINE_W, DRAFT11_OUTLINE_H)
    extrude(amount=DRAFT11_DEPTH)

    # Draft12
    draft12_faces = [part.faces().sort_by_distance(p)[0] for p in [
        (-47.78375, 3.459194076, -117.193695326),
    ]]
    draft(draft12_faces, Plane(origin=(-50.165, 3.459194076, -126.710480993), x_dir=(0, -1, 0), z_dir=(0, 0, -1)), DRAFT12_ANGLE)

    # Chamfer1
    chamfer1_edges = [part.edges().sort_by_distance(p)[0] for p in [
        (-47.78375, 268.202734319, 88.839020466),
    ]]
    chamfer1_side = [part.faces().sort_by_distance(p)[0] for p in [
        (-47.78375, 267.586262537, 82.709048083),
    ]]
    chamfer(chamfer1_edges, length=CHAMFER1_SIZE, length2=CHAMFER1_SIZE2, reference=chamfer1_side[0])

    # Chamfer2
    chamfer2_edges = [part.edges().sort_by_distance(p)[0] for p in [
        (-47.78375, 197.776967512, 46.181423967),
    ]]
    chamfer2_side = [part.faces().sort_by_distance(p)[0] for p in [
        (-47.78375, 219.486814614, 51.25645316),
    ]]
    chamfer(chamfer2_edges, length=CHAMFER2_SIZE, length2=CHAMFER2_SIZE2, reference=chamfer2_side[0])

    # Chamfer3
    # the kernel refuses this chamfer: 4.192230568, 1.908890983, 1.781251189, 1.693531442 mm, written as the material it takes off along each edge
    with BuildSketch(Plane(origin=(-45.3898, 472.948594066, 43.261693123), x_dir=(-1, 0, 0), z_dir=(0, -0.6721877610222942, 0.7403807222853895))) as chamfer3_piece_1_section:
        Polygon((CHAMFER3_SIZE, 0), (0, CHAMFER3_SIZE_2), (0, 0), align=None)
    chamfer3_piece_1 = extrude(amount=34.564479699, mode=Mode.PRIVATE)
    chamfer3_piece_1 = split(chamfer3_piece_1, bisect_by=Plane(origin=(-45.4025, 472.948594066, 43.261693123), z_dir=(1, 0, 0)), keep=Keep.TOP, mode=Mode.PRIVATE)
    add(chamfer3_piece_1, mode=Mode.SUBTRACT)

    # Chamfer4
    chamfer4_edges = [part.edges().sort_by_distance(p)[0] for p in [
        (-47.78375, 250.310437595, 101.306292113),
    ]]
    chamfer4_side = [part.faces().sort_by_distance(p)[0] for p in [
        (-47.78375, 260.433772257, 106.244981045),
    ]]
    chamfer(chamfer4_edges, length=CHAMFER4_SIZE, length2=CHAMFER4_SIZE2, reference=chamfer4_side[0])

    # Chamfer5
    chamfer5_edges = [part.edges().sort_by_distance(p)[0] for p in [
        (-47.78375, 66.118439508, -126.710480993),
    ]]
    chamfer5_side = [part.faces().sort_by_distance(p)[0] for p in [
        (-47.78375, 34.788816792, -126.710480993),
    ]]
    chamfer(chamfer5_edges, length=CHAMFER5_SIZE, length2=CHAMFER5_SIZE2, reference=chamfer5_side[0])

    # Fillet1
    fillet1_edges = [part.edges().sort_by_distance(p)[0] for p in [
        (-47.7774, 411.952661405, -58.2376066),
        (-47.7774, 411.952661405, 13.027117867),
    ]]
    fillet(fillet1_edges, radius=FILLET1_R)

    # Fillet2
    fillet2_edges = [part.edges().sort_by_distance(p)[0] for p in [
        (-47.78375, 482.569106517, 61.005482484),
    ]]
    fillet(fillet2_edges, radius=FILLET2_R)

    # Fillet3
    fillet3_edges = [part.edges().sort_by_distance(p)[0] for p in [
        (-47.7774, 424.652661405, 9.412118588),
        (-47.7774, 424.652661405, -53.975399251),
    ]]
    fillet(fillet3_edges, radius=FILLET3_R)

    # Sketch8 → Cut-Extrude6 (cut, through all)
    with BuildSketch(Plane(origin=(-45.4025, 0, 0), x_dir=(0, 0, -1), z_dir=(1, 0, 0))):
        with Locations((-90.178928963, 387.356885758)):
            Circle(SKETCH8_R)
    extrude(amount=-CUT_EXTRUDE6_DEPTH, mode=Mode.SUBTRACT)


solid = part.part
